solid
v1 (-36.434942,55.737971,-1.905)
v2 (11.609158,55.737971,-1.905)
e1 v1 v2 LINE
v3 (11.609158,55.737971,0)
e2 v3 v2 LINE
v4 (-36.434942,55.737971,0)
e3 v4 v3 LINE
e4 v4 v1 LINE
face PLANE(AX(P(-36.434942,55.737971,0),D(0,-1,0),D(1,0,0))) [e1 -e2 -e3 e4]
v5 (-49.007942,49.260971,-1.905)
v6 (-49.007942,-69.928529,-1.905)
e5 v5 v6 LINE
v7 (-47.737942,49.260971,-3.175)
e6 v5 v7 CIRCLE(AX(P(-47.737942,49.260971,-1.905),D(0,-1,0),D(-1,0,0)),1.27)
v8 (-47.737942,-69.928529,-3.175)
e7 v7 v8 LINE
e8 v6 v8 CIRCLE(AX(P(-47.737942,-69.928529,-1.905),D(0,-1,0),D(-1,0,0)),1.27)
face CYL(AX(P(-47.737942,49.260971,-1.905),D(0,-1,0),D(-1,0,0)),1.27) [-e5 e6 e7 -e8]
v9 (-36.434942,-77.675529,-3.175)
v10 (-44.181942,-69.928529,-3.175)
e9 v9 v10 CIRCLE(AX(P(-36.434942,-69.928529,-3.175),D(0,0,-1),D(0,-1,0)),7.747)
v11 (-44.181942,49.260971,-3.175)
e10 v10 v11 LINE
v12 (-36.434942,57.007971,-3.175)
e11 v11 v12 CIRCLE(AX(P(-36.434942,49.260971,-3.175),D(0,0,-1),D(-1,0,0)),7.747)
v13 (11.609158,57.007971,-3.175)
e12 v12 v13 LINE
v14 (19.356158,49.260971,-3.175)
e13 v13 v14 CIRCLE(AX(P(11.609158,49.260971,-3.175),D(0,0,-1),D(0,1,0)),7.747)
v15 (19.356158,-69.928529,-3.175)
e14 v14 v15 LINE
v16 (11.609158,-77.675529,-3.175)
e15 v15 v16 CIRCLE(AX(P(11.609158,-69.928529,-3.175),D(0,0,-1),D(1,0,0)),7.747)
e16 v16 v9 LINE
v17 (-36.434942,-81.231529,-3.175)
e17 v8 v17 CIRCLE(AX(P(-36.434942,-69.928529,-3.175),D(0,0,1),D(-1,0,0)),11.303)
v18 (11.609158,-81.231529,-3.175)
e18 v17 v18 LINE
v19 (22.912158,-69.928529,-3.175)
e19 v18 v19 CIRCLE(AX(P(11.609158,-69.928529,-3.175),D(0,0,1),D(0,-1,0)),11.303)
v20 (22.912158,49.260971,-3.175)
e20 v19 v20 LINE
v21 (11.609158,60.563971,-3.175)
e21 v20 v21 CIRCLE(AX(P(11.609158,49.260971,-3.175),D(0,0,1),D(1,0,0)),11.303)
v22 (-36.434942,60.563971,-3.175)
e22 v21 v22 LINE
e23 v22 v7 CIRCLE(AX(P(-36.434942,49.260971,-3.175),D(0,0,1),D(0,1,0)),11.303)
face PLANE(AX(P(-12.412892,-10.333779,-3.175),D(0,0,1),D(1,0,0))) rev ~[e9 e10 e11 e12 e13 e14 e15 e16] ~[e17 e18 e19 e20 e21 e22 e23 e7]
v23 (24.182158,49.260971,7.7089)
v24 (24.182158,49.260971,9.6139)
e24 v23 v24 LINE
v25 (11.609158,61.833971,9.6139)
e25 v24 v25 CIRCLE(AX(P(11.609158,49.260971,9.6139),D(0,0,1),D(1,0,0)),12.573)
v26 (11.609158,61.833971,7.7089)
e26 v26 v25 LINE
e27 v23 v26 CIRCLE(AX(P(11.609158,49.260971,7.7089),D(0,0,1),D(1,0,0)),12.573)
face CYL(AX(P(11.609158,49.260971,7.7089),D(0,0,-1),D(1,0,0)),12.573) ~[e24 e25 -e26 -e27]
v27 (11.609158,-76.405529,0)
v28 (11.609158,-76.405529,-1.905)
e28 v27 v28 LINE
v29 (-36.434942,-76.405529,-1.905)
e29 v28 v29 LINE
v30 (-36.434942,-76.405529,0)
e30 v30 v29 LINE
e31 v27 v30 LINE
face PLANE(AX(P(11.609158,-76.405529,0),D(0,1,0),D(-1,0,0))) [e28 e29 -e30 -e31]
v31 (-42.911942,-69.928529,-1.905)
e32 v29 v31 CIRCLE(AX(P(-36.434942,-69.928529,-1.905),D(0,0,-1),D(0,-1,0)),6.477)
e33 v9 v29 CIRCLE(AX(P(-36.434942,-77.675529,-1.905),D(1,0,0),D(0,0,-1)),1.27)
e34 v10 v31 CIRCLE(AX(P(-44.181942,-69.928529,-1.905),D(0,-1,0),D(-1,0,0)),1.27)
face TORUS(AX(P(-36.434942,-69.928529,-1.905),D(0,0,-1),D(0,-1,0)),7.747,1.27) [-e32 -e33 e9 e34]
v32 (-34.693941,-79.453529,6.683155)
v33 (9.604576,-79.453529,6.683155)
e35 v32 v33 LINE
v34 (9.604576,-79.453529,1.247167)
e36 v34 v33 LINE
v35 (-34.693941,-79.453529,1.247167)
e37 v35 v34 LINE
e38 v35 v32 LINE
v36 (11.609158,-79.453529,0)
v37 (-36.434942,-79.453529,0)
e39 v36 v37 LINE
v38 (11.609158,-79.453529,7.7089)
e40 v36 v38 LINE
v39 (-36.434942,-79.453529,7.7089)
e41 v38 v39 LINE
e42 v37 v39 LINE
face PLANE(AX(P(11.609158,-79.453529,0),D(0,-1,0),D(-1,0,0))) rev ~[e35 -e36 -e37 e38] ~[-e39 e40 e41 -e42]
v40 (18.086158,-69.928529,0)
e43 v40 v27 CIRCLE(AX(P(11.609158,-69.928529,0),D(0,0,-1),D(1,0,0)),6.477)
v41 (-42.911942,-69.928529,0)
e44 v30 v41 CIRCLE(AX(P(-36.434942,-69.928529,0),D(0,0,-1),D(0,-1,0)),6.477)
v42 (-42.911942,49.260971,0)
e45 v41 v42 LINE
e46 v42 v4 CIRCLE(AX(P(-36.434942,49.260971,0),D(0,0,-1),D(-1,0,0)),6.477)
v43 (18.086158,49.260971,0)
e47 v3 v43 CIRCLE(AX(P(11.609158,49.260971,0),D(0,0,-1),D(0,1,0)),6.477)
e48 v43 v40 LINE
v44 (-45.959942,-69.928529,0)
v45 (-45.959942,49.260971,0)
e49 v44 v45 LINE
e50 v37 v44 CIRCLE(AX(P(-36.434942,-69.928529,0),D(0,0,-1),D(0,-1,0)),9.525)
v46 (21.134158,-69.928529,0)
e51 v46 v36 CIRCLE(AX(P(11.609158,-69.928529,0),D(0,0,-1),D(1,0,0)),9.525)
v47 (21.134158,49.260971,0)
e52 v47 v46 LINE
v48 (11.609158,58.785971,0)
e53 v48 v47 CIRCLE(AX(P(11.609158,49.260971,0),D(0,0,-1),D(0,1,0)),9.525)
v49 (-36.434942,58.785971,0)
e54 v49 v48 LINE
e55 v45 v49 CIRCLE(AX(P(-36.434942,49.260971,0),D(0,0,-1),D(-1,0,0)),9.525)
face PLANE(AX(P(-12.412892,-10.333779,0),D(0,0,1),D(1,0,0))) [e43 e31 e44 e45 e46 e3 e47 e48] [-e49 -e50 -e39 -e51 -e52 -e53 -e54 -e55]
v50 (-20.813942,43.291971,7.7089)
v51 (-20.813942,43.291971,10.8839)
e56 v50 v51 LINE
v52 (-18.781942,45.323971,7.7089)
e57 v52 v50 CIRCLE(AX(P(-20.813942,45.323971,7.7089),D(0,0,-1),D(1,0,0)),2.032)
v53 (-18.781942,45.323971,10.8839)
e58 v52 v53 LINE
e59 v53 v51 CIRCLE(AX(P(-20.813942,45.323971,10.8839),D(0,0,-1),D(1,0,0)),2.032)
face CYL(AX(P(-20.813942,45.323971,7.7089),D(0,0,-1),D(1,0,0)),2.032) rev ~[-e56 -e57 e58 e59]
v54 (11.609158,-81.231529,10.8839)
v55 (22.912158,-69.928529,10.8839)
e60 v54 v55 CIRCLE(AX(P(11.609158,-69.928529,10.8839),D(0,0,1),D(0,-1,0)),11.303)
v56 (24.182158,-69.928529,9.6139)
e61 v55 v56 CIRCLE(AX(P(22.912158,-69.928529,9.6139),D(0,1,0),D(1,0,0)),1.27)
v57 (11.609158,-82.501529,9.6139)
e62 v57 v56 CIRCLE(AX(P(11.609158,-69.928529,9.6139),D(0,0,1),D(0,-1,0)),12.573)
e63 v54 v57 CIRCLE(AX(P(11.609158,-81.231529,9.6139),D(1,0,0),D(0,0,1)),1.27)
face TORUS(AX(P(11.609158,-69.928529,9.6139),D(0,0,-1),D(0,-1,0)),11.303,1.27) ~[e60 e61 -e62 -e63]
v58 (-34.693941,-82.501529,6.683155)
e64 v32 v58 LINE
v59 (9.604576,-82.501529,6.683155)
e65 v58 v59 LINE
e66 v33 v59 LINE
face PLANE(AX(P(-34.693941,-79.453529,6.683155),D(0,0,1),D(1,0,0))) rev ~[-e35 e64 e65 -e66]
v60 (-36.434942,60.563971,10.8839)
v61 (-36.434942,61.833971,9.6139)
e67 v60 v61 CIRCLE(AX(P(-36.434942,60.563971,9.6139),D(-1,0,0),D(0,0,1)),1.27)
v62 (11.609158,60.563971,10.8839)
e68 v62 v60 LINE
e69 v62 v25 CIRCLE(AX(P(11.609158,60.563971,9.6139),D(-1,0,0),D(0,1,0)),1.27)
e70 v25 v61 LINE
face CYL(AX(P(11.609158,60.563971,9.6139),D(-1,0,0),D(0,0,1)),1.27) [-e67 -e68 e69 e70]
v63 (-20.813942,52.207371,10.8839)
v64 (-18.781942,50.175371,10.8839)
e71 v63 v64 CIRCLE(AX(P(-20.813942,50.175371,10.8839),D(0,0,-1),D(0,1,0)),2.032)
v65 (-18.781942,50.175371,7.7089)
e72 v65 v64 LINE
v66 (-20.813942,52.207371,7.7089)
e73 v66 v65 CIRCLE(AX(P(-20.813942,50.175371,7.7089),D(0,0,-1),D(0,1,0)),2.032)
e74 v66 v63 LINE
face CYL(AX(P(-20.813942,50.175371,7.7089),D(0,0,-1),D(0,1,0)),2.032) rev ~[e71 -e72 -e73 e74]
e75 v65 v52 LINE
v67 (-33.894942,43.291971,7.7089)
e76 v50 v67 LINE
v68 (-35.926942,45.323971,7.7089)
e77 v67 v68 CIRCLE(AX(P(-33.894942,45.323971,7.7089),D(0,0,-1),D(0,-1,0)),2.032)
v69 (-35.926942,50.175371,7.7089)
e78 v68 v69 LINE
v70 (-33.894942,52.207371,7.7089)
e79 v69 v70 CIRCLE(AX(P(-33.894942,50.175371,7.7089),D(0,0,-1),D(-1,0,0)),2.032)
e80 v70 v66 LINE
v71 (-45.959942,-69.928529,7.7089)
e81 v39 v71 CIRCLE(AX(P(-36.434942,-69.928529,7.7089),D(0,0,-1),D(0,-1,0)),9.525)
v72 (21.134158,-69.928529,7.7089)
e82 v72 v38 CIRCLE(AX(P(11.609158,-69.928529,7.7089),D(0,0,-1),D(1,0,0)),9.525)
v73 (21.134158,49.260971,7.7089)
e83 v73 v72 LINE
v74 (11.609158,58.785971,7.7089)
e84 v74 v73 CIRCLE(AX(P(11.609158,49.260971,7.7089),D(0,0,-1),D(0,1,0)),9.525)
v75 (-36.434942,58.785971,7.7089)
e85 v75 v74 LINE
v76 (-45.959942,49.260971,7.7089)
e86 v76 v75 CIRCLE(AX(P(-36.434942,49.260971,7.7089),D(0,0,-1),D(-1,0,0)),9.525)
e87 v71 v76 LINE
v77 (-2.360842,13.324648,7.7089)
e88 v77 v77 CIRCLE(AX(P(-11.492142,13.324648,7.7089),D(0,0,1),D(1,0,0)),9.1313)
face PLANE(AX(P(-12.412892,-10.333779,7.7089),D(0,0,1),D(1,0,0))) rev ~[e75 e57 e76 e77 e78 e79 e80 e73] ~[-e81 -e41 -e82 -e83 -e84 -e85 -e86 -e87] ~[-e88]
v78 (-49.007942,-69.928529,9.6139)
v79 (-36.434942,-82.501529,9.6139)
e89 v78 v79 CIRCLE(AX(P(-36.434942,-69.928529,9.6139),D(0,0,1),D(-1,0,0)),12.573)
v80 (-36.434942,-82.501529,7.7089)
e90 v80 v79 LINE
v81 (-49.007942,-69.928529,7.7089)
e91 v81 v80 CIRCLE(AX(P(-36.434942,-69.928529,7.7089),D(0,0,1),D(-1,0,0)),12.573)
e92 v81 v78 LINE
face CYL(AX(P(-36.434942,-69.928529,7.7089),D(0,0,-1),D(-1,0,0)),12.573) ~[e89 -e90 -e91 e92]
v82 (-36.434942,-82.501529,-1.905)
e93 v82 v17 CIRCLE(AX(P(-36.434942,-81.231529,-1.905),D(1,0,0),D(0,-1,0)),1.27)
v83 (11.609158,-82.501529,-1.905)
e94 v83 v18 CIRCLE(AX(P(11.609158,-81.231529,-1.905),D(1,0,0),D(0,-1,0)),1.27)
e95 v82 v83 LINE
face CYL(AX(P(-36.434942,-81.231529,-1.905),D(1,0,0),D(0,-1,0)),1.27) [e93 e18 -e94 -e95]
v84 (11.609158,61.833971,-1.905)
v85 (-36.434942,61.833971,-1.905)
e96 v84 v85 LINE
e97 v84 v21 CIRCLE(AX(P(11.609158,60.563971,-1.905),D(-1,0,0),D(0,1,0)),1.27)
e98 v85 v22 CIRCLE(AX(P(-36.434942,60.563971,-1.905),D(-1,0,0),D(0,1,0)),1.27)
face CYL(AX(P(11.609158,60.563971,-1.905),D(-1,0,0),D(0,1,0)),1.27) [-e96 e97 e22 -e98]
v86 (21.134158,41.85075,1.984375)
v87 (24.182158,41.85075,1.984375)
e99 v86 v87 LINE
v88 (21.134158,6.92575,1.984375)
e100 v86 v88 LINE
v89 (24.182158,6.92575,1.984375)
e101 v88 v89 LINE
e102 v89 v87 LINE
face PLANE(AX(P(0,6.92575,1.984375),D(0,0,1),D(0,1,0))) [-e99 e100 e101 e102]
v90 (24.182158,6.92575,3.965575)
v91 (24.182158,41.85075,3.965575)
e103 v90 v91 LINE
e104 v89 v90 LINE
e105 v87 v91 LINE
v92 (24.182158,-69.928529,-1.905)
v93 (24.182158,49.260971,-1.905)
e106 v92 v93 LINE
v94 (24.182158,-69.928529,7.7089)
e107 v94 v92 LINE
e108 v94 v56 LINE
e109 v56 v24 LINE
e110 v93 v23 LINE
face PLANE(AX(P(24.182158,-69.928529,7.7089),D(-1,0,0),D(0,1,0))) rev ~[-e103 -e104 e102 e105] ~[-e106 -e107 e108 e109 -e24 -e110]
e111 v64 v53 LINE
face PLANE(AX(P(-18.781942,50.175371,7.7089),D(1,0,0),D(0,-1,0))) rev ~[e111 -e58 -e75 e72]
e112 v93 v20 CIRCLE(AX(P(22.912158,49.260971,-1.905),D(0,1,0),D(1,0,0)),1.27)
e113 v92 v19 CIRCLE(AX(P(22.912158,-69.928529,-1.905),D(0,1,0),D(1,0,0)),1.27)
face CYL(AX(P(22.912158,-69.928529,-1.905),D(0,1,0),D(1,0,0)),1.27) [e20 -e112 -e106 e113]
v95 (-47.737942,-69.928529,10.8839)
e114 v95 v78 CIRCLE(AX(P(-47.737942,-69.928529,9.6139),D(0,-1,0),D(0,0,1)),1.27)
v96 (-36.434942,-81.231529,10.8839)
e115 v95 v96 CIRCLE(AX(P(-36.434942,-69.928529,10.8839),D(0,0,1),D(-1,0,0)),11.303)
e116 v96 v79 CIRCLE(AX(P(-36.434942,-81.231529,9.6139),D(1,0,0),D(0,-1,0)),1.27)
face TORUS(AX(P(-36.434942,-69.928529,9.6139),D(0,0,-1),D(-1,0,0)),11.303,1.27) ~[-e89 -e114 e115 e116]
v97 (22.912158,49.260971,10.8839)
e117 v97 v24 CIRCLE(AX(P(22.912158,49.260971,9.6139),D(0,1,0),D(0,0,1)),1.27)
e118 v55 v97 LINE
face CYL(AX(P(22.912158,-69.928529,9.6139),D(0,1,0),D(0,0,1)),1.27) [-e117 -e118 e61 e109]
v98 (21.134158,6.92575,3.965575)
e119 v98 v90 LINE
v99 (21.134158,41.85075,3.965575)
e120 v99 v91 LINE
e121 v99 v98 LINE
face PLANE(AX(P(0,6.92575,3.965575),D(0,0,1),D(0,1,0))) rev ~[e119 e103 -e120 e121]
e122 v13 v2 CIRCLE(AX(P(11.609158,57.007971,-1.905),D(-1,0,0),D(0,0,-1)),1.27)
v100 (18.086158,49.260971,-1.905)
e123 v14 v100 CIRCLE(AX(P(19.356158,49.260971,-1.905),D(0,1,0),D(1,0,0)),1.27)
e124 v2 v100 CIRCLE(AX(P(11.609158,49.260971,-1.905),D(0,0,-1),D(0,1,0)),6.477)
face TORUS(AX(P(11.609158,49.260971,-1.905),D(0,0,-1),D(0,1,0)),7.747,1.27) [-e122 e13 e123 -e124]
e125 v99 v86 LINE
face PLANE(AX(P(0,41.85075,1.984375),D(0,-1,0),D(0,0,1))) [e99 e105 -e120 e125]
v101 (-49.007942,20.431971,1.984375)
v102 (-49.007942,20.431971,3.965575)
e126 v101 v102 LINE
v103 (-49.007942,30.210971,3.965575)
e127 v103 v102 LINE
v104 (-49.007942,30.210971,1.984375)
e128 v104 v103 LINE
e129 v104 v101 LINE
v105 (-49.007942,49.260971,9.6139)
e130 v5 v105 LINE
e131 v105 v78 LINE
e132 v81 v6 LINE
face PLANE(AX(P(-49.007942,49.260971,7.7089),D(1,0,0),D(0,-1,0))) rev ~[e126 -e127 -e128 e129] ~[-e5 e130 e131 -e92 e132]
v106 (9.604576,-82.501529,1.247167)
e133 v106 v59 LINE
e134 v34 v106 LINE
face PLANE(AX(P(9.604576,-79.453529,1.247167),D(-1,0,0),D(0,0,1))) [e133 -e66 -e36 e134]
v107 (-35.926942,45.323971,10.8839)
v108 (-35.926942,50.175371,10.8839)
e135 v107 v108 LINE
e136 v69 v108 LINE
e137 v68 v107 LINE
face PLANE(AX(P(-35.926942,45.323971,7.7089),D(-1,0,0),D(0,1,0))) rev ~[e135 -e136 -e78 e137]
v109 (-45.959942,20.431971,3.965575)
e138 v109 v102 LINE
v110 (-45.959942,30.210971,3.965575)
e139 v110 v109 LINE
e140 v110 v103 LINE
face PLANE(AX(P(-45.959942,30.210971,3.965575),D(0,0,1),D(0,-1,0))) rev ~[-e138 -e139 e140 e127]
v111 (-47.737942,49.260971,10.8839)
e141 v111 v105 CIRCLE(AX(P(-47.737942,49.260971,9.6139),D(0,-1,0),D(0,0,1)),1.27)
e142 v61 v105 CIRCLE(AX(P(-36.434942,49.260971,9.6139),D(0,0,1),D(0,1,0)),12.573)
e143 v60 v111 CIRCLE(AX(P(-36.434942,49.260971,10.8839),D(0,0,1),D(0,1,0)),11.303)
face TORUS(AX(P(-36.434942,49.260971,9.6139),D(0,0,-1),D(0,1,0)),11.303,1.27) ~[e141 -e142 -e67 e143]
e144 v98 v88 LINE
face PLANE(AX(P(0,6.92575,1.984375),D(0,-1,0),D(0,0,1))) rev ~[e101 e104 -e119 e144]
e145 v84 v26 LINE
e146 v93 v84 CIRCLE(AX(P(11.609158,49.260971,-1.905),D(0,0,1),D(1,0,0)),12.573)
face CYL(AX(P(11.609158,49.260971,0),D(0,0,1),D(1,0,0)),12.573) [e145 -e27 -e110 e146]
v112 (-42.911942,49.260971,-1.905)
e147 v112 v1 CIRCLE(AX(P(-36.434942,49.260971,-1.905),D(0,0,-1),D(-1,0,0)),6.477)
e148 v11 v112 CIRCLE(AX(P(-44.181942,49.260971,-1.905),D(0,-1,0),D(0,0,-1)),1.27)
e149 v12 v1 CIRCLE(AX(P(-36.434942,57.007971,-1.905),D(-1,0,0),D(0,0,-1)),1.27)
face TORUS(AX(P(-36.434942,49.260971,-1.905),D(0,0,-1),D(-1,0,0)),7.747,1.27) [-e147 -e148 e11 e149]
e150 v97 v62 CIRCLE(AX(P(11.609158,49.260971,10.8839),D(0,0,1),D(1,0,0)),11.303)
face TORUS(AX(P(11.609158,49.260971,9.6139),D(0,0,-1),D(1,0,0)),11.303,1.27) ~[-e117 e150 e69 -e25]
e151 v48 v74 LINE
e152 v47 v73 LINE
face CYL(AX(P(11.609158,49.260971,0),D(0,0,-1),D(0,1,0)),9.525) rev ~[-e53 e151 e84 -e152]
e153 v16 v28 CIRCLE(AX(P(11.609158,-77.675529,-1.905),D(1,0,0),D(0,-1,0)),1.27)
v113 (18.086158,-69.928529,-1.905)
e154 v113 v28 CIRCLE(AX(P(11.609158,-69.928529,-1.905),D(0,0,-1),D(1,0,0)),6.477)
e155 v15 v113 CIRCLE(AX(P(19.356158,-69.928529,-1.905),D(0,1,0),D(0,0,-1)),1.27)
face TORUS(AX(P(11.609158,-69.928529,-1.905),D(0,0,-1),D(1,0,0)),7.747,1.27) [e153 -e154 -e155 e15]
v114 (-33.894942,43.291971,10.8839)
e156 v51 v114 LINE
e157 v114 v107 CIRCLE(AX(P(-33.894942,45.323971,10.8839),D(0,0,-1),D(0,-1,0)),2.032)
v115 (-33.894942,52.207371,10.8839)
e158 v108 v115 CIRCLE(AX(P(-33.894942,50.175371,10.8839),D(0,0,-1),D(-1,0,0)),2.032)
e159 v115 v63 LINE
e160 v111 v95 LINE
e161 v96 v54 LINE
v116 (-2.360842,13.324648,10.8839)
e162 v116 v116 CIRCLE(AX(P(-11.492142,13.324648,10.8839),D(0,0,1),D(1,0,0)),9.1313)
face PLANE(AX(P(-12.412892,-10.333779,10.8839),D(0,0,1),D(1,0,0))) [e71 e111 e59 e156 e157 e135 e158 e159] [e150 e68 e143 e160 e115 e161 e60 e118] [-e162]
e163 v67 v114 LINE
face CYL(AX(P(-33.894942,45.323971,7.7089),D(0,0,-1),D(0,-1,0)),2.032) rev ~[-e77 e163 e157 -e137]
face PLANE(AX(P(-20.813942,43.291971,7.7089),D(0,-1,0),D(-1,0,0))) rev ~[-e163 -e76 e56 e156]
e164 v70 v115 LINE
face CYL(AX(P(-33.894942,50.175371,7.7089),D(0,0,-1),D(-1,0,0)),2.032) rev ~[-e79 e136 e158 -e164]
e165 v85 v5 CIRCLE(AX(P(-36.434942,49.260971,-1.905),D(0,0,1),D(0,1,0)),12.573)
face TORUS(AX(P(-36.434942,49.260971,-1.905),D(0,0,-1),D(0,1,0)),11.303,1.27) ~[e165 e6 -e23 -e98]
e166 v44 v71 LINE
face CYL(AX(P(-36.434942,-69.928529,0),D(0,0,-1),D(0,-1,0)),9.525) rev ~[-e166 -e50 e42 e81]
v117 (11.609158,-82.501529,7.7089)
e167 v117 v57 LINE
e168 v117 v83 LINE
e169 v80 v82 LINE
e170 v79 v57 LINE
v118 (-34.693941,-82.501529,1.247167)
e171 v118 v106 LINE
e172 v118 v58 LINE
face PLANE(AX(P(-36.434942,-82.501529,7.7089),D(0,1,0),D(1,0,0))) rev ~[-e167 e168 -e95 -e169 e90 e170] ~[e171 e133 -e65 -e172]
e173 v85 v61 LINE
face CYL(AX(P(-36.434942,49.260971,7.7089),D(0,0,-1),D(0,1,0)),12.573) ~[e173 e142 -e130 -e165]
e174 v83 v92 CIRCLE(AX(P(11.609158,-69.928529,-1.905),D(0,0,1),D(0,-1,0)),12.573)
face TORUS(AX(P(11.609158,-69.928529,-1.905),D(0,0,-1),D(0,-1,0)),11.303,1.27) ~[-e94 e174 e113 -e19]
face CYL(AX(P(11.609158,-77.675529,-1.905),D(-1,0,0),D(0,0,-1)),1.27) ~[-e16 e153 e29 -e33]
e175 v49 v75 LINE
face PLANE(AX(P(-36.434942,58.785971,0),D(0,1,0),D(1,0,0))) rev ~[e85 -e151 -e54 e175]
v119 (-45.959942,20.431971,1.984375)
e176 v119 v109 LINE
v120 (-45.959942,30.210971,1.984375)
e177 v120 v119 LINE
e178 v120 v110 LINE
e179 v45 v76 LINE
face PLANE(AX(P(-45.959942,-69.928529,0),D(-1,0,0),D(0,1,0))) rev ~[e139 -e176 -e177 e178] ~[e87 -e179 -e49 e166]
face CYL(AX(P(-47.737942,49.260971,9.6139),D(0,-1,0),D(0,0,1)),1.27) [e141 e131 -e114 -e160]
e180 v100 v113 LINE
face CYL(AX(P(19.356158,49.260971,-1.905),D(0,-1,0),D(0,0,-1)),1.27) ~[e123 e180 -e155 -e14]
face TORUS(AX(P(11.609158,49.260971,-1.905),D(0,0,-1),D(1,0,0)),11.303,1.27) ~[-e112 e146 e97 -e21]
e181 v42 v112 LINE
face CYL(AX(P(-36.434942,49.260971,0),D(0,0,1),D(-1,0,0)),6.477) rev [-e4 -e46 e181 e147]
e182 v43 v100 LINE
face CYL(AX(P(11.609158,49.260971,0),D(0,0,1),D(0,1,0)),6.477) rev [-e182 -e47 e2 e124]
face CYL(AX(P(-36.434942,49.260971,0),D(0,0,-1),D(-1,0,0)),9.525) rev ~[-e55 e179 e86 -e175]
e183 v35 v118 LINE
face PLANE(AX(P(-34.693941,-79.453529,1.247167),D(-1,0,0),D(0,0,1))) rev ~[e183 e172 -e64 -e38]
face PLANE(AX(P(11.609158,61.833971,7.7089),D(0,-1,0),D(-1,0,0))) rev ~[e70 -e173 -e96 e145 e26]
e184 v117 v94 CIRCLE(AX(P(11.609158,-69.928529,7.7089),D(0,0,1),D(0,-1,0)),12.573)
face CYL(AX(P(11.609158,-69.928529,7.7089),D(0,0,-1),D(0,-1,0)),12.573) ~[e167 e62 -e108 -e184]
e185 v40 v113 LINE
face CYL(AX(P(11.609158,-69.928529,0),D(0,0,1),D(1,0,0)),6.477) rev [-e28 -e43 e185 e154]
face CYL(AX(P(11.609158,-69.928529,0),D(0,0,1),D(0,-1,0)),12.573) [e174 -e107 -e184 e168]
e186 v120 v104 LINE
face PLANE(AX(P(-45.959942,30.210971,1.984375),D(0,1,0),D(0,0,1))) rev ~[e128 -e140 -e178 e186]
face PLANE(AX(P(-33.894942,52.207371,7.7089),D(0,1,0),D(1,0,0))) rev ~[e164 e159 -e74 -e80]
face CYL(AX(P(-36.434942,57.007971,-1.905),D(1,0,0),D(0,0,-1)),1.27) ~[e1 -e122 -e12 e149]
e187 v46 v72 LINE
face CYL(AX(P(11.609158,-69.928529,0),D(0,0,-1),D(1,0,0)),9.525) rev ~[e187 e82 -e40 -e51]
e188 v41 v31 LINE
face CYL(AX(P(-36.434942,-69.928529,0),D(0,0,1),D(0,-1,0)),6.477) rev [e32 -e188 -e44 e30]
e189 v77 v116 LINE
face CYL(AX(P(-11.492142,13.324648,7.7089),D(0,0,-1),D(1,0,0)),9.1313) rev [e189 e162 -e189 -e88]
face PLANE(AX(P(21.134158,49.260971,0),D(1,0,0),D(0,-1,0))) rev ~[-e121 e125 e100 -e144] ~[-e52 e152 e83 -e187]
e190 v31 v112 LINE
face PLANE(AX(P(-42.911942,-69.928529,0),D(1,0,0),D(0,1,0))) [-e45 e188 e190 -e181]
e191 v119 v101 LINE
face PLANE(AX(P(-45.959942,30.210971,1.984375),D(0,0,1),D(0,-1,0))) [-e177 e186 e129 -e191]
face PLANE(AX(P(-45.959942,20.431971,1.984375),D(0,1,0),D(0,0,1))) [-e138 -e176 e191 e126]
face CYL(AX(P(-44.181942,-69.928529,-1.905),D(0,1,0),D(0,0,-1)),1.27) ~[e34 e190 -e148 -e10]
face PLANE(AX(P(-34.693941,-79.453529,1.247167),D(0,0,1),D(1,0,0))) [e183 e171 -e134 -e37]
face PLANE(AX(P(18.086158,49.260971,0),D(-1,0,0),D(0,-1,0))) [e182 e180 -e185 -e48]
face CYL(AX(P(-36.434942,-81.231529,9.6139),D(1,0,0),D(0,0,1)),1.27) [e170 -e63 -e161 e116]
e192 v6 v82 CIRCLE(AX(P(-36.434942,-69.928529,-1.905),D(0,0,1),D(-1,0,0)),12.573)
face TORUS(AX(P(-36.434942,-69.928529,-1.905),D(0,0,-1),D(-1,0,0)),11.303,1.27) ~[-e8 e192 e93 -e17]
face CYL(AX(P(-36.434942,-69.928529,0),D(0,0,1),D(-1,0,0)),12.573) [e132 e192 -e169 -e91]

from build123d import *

# Parameters (mm, degrees)
F0_R       = 9.1313
F1_DEPTH   = 7.7089
F2_W       = 9.779
F2_H       = 1.9812
F3_DEPTH   = 9.144
F4_W       = 44.2985175177
F4_H       = 5.4359880742
F5_DEPTH   = 17.018
F6_W       = 34.925
F6_H       = 1.9812
F7_DEPTH   = 68.834
F8_DEPTH   = 7.7089
F9_DEPTH   = 32.004
F10_DEPTH  = 3.175
F1_FACE2_R = 9.1313
F11_DEPTH  = 3.175
F13_R      = 1.27


with BuildPart() as f1:
    # F0 (on Top) → F1 (new body)
    with BuildSketch(Plane.XY):
        with BuildLine():
            Line((11.6091579572, 58.7859712541), (-36.4349420428, 58.7859712541))
            ThreePointArc((-36.4349420428, 58.7859712541), (-43.1701341336, 55.9961633449), (-45.9599420428, 49.2609712541))
            Line((-45.9599420428, 49.2609712541), (-45.9599420428, -69.9285287459))
            ThreePointArc((-45.9599420428, -69.9285287459), (-43.1701341336, -76.6637208367), (-36.4349420428, -79.4535287459))
            Line((-36.4349420428, -79.4535287459), (11.6091579572, -79.4535287459))
            ThreePointArc((11.6091579572, -79.4535287459), (18.344350048, -76.6637208367), (21.1341579572, -69.9285287459))
            Line((21.1341579572, -69.9285287459), (21.1341579572, 29.7156712541))
            Line((21.1341579572, 29.7156712541), (21.1341579572, 49.2609712541))
            ThreePointArc((21.1341579572, 49.2609712541), (18.344350048, 55.9961633449), (11.6091579572, 58.7859712541))
        make_face()
        with BuildLine():
            ThreePointArc((-42.9119420428, 49.2609712541), (-41.0148726646, 53.8409018759), (-36.4349420428, 55.7379712541))
            Line((-36.4349420428, 55.7379712541), (11.6091579572, 55.7379712541))
            ThreePointArc((11.6091579572, 55.7379712541), (16.1890885789, 53.8409018759), (18.0861579572, 49.2609712541))
            Line((18.0861579572, 49.2609712541), (18.0861579572, -69.9285287459))
            ThreePointArc((18.0861579572, -69.9285287459), (16.1890885789, -74.5084593676), (11.6091579572, -76.4055287459))
            Line((11.6091579572, -76.4055287459), (-36.4349420428, -76.4055287459))
            ThreePointArc((-36.4349420428, -76.4055287459), (-41.0148726646, -74.5084593676), (-42.9119420428, -69.9285287459))
            Line((-42.9119420428, -69.9285287459), (-42.9119420428, 49.2609712541))
        make_face(mode=Mode.SUBTRACT)
        with BuildLine():
            Line((11.6091579572, 55.7379712541), (-36.4349420428, 55.7379712541))
            ThreePointArc((-36.4349420428, 55.7379712541), (-41.0148726646, 53.8409018759), (-42.9119420428, 49.2609712541))
            Line((-42.9119420428, 49.2609712541), (-42.9119420428, -69.9285287459))
            ThreePointArc((-42.9119420428, -69.9285287459), (-41.0148726646, -74.5084593676), (-36.4349420428, -76.4055287459))
            Line((-36.4349420428, -76.4055287459), (11.6091579572, -76.4055287459))
            ThreePointArc((11.6091579572, -76.4055287459), (16.1890885789, -74.5084593676), (18.0861579572, -69.9285287459))
            Line((18.0861579572, -69.9285287459), (18.0861579572, 49.2609712541))
            ThreePointArc((18.0861579572, 49.2609712541), (16.1890885789, 53.8409018759), (11.6091579572, 55.7379712541))
        make_face()
        with BuildLine():
            Line((-35.9269420428, 45.3239712541), (-35.9269420428, 50.1753712541))
            ThreePointArc((-35.9269420428, 50.1753712541), (-35.3317830222, 51.6122122335), (-33.8949420428, 52.2073712541))
            Line((-33.8949420428, 52.2073712541), (-20.8139420428, 52.2073712541))
            ThreePointArc((-20.8139420428, 52.2073712541), (-19.3771010635, 51.6122122335), (-18.7819420428, 50.1753712541))
            Line((-18.7819420428, 50.1753712541), (-18.7819420428, 45.3239712541))
            ThreePointArc((-18.7819420428, 45.3239712541), (-19.3771010635, 43.8871302747), (-20.8139420428, 43.2919712541))
            Line((-20.8139420428, 43.2919712541), (-33.8949420428, 43.2919712541))
            ThreePointArc((-33.8949420428, 43.2919712541), (-35.3317830222, 43.8871302747), (-35.9269420428, 45.3239712541))
        make_face(mode=Mode.SUBTRACT)
        with Locations((-11.4921420428, 13.3246481419)):
            Circle(F0_R, mode=Mode.SUBTRACT)
    extrude(amount=F1_DEPTH)

    # F4 (on face) → F5 (join)
    with BuildSketch(Plane.XZ.offset(79.4535287459)):
        with Locations((-12.5446827151, 3.9651609259)):
            Rectangle(F4_W, F4_H)
    extrude(amount=F5_DEPTH)

    # F0 (on Top) → F9 (join)
    with BuildSketch(Plane.XY):
        with BuildLine():
            Line((11.6091579572, 55.7379712541), (-36.4349420428, 55.7379712541))
            ThreePointArc((-36.4349420428, 55.7379712541), (-41.0148726646, 53.8409018759), (-42.9119420428, 49.2609712541))
            Line((-42.9119420428, 49.2609712541), (-42.9119420428, -69.9285287459))
            ThreePointArc((-42.9119420428, -69.9285287459), (-41.0148726646, -74.5084593676), (-36.4349420428, -76.4055287459))
            Line((-36.4349420428, -76.4055287459), (11.6091579572, -76.4055287459))
            ThreePointArc((11.6091579572, -76.4055287459), (16.1890885789, -74.5084593676), (18.0861579572, -69.9285287459))
            Line((18.0861579572, -69.9285287459), (18.0861579572, 49.2609712541))
            ThreePointArc((18.0861579572, 49.2609712541), (16.1890885789, 53.8409018759), (11.6091579572, 55.7379712541))
        make_face()
        with BuildLine():
            Line((-35.9269420428, 45.3239712541), (-35.9269420428, 50.1753712541))
            ThreePointArc((-35.9269420428, 50.1753712541), (-35.3317830222, 51.6122122335), (-33.8949420428, 52.2073712541))
            Line((-33.8949420428, 52.2073712541), (-20.8139420428, 52.2073712541))
            ThreePointArc((-20.8139420428, 52.2073712541), (-19.3771010635, 51.6122122335), (-18.7819420428, 50.1753712541))
            Line((-18.7819420428, 50.1753712541), (-18.7819420428, 45.3239712541))
            ThreePointArc((-18.7819420428, 45.3239712541), (-19.3771010635, 43.8871302747), (-20.8139420428, 43.2919712541))
            Line((-20.8139420428, 43.2919712541), (-33.8949420428, 43.2919712541))
            ThreePointArc((-33.8949420428, 43.2919712541), (-35.3317830222, 43.8871302747), (-35.9269420428, 45.3239712541))
        make_face(mode=Mode.SUBTRACT)
        with Locations((-11.4921420428, 13.3246481419)):
            Circle(F0_R, mode=Mode.SUBTRACT)
    extrude(amount=-F9_DEPTH)


with BuildPart() as f3:
    # F2 (on face) → F3 (new body)
    with BuildSketch(Plane(origin=(-45.9599420428, 0, 0), x_dir=(0, -1, 0), z_dir=(-1, 0, 0))):
        with Locations((-25.3214712541, 2.974975)):
            Rectangle(F2_W, F2_H)
    extrude(amount=F3_DEPTH)


with BuildPart() as f7:
    # F6 (on Right) → F7 (new body)
    with BuildSketch(Plane.YZ):
        with Locations((24.3882495925, 2.974975)):
            Rectangle(F6_W, F6_H)
    extrude(amount=F7_DEPTH)


with BuildPart() as f8:
    # F0 (on Top) → F8 (new body, through all)
    with BuildSketch(Plane.XY):
        with BuildLine():
            Line((24.1821579572, -69.9285287459), (24.1821579572, 49.2609712541))
            ThreePointArc((24.1821579572, 49.2609712541), (20.499611517, 58.151424814), (11.6091579572, 61.8339712541))
            Line((11.6091579572, 61.8339712541), (-36.4349420428, 61.8339712541))
            ThreePointArc((-36.4349420428, 61.8339712541), (-45.3253956027, 58.151424814), (-49.0079420428, 49.2609712541))
            Line((-49.0079420428, 49.2609712541), (-49.0079420428, -69.9285287459))
            ThreePointArc((-49.0079420428, -69.9285287459), (-45.3253956027, -78.8189823057), (-36.4349420428, -82.5015287459))
            Line((-36.4349420428, -82.5015287459), (11.6091579572, -82.5015287459))
            ThreePointArc((11.6091579572, -82.5015287459), (20.499611517, -78.8189823057), (24.1821579572, -69.9285287459))
        make_face()
        with BuildLine():
            ThreePointArc((-45.9599420428, 49.2609712541), (-43.1701341336, 55.9961633449), (-36.4349420428, 58.7859712541))
            Line((-36.4349420428, 58.7859712541), (11.6091579572, 58.7859712541))
            ThreePointArc((11.6091579572, 58.7859712541), (18.344350048, 55.9961633449), (21.1341579572, 49.2609712541))
            Line((21.1341579572, 49.2609712541), (21.1341579572, 29.7156712541))
            Line((21.1341579572, 29.7156712541), (21.1341579572, -69.9285287459))
            ThreePointArc((21.1341579572, -69.9285287459), (18.344350048, -76.6637208367), (11.6091579572, -79.4535287459))
            Line((11.6091579572, -79.4535287459), (-36.4349420428, -79.4535287459))
            ThreePointArc((-36.4349420428, -79.4535287459), (-43.1701341336, -76.6637208367), (-45.9599420428, -69.9285287459))
            Line((-45.9599420428, -69.9285287459), (-45.9599420428, 49.2609712541))
        make_face(mode=Mode.SUBTRACT)
    extrude(amount=F8_DEPTH)

    # F0 (on Top) → F10 (join)
    with BuildSketch(Plane.XY):
        with BuildLine():
            Line((24.1821579572, -69.9285287459), (24.1821579572, 49.2609712541))
            ThreePointArc((24.1821579572, 49.2609712541), (20.499611517, 58.151424814), (11.6091579572, 61.8339712541))
            Line((11.6091579572, 61.8339712541), (-36.4349420428, 61.8339712541))
            ThreePointArc((-36.4349420428, 61.8339712541), (-45.3253956027, 58.151424814), (-49.0079420428, 49.2609712541))
            Line((-49.0079420428, 49.2609712541), (-49.0079420428, -69.9285287459))
            ThreePointArc((-49.0079420428, -69.9285287459), (-45.3253956027, -78.8189823057), (-36.4349420428, -82.5015287459))
            Line((-36.4349420428, -82.5015287459), (11.6091579572, -82.5015287459))
            ThreePointArc((11.6091579572, -82.5015287459), (20.499611517, -78.8189823057), (24.1821579572, -69.9285287459))
        make_face()
        with BuildLine():
            ThreePointArc((-45.9599420428, 49.2609712541), (-43.1701341336, 55.9961633449), (-36.4349420428, 58.7859712541))
            Line((-36.4349420428, 58.7859712541), (11.6091579572, 58.7859712541))
            ThreePointArc((11.6091579572, 58.7859712541), (18.344350048, 55.9961633449), (21.1341579572, 49.2609712541))
            Line((21.1341579572, 49.2609712541), (21.1341579572, 29.7156712541))
            Line((21.1341579572, 29.7156712541), (21.1341579572, -69.9285287459))
            ThreePointArc((21.1341579572, -69.9285287459), (18.344350048, -76.6637208367), (11.6091579572, -79.4535287459))
            Line((11.6091579572, -79.4535287459), (-36.4349420428, -79.4535287459))
            ThreePointArc((-36.4349420428, -79.4535287459), (-43.1701341336, -76.6637208367), (-45.9599420428, -69.9285287459))
            Line((-45.9599420428, -69.9285287459), (-45.9599420428, 49.2609712541))
        make_face(mode=Mode.SUBTRACT)
        with BuildLine():
            Line((11.6091579572, 58.7859712541), (-36.4349420428, 58.7859712541))
            ThreePointArc((-36.4349420428, 58.7859712541), (-43.1701341336, 55.9961633449), (-45.9599420428, 49.2609712541))
            Line((-45.9599420428, 49.2609712541), (-45.9599420428, -69.9285287459))
            ThreePointArc((-45.9599420428, -69.9285287459), (-43.1701341336, -76.6637208367), (-36.4349420428, -79.4535287459))
            Line((-36.4349420428, -79.4535287459), (11.6091579572, -79.4535287459))
            ThreePointArc((11.6091579572, -79.4535287459), (18.344350048, -76.6637208367), (21.1341579572, -69.9285287459))
            Line((21.1341579572, -69.9285287459), (21.1341579572, 29.7156712541))
            Line((21.1341579572, 29.7156712541), (21.1341579572, 49.2609712541))
            ThreePointArc((21.1341579572, 49.2609712541), (18.344350048, 55.9961633449), (11.6091579572, 58.7859712541))
        make_face()
        with BuildLine():
            ThreePointArc((-42.9119420428, 49.2609712541), (-41.0148726646, 53.8409018759), (-36.4349420428, 55.7379712541))
            Line((-36.4349420428, 55.7379712541), (11.6091579572, 55.7379712541))
            ThreePointArc((11.6091579572, 55.7379712541), (16.1890885789, 53.8409018759), (18.0861579572, 49.2609712541))
            Line((18.0861579572, 49.2609712541), (18.0861579572, -69.9285287459))
            ThreePointArc((18.0861579572, -69.9285287459), (16.1890885789, -74.5084593676), (11.6091579572, -76.4055287459))
            Line((11.6091579572, -76.4055287459), (-36.4349420428, -76.4055287459))
            ThreePointArc((-36.4349420428, -76.4055287459), (-41.0148726646, -74.5084593676), (-42.9119420428, -69.9285287459))
            Line((-42.9119420428, -69.9285287459), (-42.9119420428, 49.2609712541))
        make_face(mode=Mode.SUBTRACT)
    extrude(amount=-F10_DEPTH)

    # F1_face2 (on face) + F8_face (on face) → F11 (join)
    with BuildSketch(Plane(origin=(-12.1864232074, -12.0262288376, 7.7089), x_dir=(1, 0, 0), z_dir=(0, 0, 1))):
        with BuildLine():
            Line((23.7955811646, 70.8122000917), (-24.2485188354, 70.8122000917))
            ThreePointArc((-24.2485188354, 70.8122000917), (-30.9837109262, 68.0223921825), (-33.7735188354, 61.2872000917))
            Line((-33.7735188354, 61.2872000917), (-33.7735188354, -57.9022999083))
            ThreePointArc((-33.7735188354, -57.9022999083), (-30.9837109262, -64.6374919991), (-24.2485188354, -67.4272999083))
            Line((-24.2485188354, -67.4272999083), (23.7955811646, -67.4272999083))
            ThreePointArc((23.7955811646, -67.4272999083), (30.5307732554, -64.6374919991), (33.3205811646, -57.9022999083))
            Line((33.3205811646, -57.9022999083), (33.3205811646, 61.2872000917))
            ThreePointArc((33.3205811646, 61.2872000917), (30.5307732554, 68.0223921825), (23.7955811646, 70.8122000917))
        make_face()
        with BuildLine():
            Line((-8.6275188354, 55.3182000917), (-21.7085188354, 55.3182000917))
            ThreePointArc((-21.7085188354, 55.3182000917), (-23.1453598148, 55.9133591123), (-23.7405188354, 57.3502000917))
            Line((-23.7405188354, 57.3502000917), (-23.7405188354, 62.2016000917))
            ThreePointArc((-23.7405188354, 62.2016000917), (-23.1453598148, 63.6384410711), (-21.7085188354, 64.2336000917))
            Line((-21.7085188354, 64.2336000917), (-8.6275188354, 64.2336000917))
            ThreePointArc((-8.6275188354, 64.2336000917), (-7.1906778561, 63.6384410711), (-6.5955188354, 62.2016000917))
            Line((-6.5955188354, 62.2016000917), (-6.5955188354, 57.3502000917))
            ThreePointArc((-6.5955188354, 57.3502000917), (-7.1906778561, 55.9133591123), (-8.6275188354, 55.3182000917))
        make_face(mode=Mode.SUBTRACT)
        with Locations((0.6942811646, 25.3508769795)):
            Circle(F1_FACE2_R, mode=Mode.SUBTRACT)
    with BuildSketch(Plane(origin=(-12.4128920428, -10.3337787459, 7.7089), x_dir=(1, 0, 0), z_dir=(0, 0, 1))):
        with BuildLine():
            Line((36.59505, -59.59475), (36.59505, 59.59475))
            ThreePointArc((36.59505, 59.59475), (32.9125035599, 68.4852035599), (24.02205, 72.16775))
            Line((24.02205, 72.16775), (-24.02205, 72.16775))
            ThreePointArc((-24.02205, 72.16775), (-32.9125035599, 68.4852035599), (-36.59505, 59.59475))
            Line((-36.59505, 59.59475), (-36.59505, -59.59475))
            ThreePointArc((-36.59505, -59.59475), (-32.9125035599, -68.4852035599), (-24.02205, -72.16775))
            Line((-24.02205, -72.16775), (24.02205, -72.16775))
            ThreePointArc((24.02205, -72.16775), (32.9125035599, -68.4852035599), (36.59505, -59.59475))
        make_face()
        with BuildLine():
            ThreePointArc((-33.54705, 59.59475), (-30.7572420908, 66.3299420908), (-24.02205, 69.11975))
            Line((-24.02205, 69.11975), (24.02205, 69.11975))
            ThreePointArc((24.02205, 69.11975), (30.7572420908, 66.3299420908), (33.54705, 59.59475))
            Line((33.54705, 59.59475), (33.54705, -59.59475))
            ThreePointArc((33.54705, -59.59475), (30.7572420908, -66.3299420908), (24.02205, -69.11975))
            Line((24.02205, -69.11975), (-24.02205, -69.11975))
            ThreePointArc((-24.02205, -69.11975), (-30.7572420908, -66.3299420908), (-33.54705, -59.59475))
            Line((-33.54705, -59.59475), (-33.54705, 59.59475))
        make_face(mode=Mode.SUBTRACT)
    extrude(amount=F11_DEPTH)

    # F12: cut F3, F7, F1
    add(f3.part, mode=Mode.SUBTRACT)
    add(f7.part, mode=Mode.SUBTRACT)
    add(f1.part, mode=Mode.SUBTRACT)

    # F13
    f13_edges = [f8.edges().sort_by_distance(p)[0] for p in [
        (-49.007942, -10.333779, -3.175),
        (-45.325396, -78.818982, -3.175),
        (-49.007942, -10.333779, 10.8839),
        (-12.412892, 55.737971, -3.175),
        (24.182158, -10.333779, 10.8839),
        (24.182158, -10.333779, -3.175),
        (20.499612, -78.818982, 10.8839),
        (20.499612, -78.818982, -3.175),
        (20.499612, 58.151425, 10.8839),
        (-12.412892, 61.833971, 10.8839),
        (-45.325396, 58.151425, 10.8839),
        (-45.325396, -78.818982, 10.8839),
        (-12.412892, -82.501529, 10.8839),
        (-41.014873, 53.840902, -3.175),
        (16.189089, 53.840902, -3.175),
        (18.086158, -10.333779, -3.175),
        (16.189089, -74.508459, -3.175),
        (-12.412892, -76.405529, -3.175),
        (-41.014873, -74.508459, -3.175),
        (-42.911942, -10.333779, -3.175),
        (20.499612, 58.151425, -3.175),
        (-12.412892, 61.833971, -3.175),
        (-45.325396, 58.151425, -3.175),
        (-12.412892, -82.501529, -3.175),
    ]]
    fillet(f13_edges, radius=F13_R)


solid = f8.part
